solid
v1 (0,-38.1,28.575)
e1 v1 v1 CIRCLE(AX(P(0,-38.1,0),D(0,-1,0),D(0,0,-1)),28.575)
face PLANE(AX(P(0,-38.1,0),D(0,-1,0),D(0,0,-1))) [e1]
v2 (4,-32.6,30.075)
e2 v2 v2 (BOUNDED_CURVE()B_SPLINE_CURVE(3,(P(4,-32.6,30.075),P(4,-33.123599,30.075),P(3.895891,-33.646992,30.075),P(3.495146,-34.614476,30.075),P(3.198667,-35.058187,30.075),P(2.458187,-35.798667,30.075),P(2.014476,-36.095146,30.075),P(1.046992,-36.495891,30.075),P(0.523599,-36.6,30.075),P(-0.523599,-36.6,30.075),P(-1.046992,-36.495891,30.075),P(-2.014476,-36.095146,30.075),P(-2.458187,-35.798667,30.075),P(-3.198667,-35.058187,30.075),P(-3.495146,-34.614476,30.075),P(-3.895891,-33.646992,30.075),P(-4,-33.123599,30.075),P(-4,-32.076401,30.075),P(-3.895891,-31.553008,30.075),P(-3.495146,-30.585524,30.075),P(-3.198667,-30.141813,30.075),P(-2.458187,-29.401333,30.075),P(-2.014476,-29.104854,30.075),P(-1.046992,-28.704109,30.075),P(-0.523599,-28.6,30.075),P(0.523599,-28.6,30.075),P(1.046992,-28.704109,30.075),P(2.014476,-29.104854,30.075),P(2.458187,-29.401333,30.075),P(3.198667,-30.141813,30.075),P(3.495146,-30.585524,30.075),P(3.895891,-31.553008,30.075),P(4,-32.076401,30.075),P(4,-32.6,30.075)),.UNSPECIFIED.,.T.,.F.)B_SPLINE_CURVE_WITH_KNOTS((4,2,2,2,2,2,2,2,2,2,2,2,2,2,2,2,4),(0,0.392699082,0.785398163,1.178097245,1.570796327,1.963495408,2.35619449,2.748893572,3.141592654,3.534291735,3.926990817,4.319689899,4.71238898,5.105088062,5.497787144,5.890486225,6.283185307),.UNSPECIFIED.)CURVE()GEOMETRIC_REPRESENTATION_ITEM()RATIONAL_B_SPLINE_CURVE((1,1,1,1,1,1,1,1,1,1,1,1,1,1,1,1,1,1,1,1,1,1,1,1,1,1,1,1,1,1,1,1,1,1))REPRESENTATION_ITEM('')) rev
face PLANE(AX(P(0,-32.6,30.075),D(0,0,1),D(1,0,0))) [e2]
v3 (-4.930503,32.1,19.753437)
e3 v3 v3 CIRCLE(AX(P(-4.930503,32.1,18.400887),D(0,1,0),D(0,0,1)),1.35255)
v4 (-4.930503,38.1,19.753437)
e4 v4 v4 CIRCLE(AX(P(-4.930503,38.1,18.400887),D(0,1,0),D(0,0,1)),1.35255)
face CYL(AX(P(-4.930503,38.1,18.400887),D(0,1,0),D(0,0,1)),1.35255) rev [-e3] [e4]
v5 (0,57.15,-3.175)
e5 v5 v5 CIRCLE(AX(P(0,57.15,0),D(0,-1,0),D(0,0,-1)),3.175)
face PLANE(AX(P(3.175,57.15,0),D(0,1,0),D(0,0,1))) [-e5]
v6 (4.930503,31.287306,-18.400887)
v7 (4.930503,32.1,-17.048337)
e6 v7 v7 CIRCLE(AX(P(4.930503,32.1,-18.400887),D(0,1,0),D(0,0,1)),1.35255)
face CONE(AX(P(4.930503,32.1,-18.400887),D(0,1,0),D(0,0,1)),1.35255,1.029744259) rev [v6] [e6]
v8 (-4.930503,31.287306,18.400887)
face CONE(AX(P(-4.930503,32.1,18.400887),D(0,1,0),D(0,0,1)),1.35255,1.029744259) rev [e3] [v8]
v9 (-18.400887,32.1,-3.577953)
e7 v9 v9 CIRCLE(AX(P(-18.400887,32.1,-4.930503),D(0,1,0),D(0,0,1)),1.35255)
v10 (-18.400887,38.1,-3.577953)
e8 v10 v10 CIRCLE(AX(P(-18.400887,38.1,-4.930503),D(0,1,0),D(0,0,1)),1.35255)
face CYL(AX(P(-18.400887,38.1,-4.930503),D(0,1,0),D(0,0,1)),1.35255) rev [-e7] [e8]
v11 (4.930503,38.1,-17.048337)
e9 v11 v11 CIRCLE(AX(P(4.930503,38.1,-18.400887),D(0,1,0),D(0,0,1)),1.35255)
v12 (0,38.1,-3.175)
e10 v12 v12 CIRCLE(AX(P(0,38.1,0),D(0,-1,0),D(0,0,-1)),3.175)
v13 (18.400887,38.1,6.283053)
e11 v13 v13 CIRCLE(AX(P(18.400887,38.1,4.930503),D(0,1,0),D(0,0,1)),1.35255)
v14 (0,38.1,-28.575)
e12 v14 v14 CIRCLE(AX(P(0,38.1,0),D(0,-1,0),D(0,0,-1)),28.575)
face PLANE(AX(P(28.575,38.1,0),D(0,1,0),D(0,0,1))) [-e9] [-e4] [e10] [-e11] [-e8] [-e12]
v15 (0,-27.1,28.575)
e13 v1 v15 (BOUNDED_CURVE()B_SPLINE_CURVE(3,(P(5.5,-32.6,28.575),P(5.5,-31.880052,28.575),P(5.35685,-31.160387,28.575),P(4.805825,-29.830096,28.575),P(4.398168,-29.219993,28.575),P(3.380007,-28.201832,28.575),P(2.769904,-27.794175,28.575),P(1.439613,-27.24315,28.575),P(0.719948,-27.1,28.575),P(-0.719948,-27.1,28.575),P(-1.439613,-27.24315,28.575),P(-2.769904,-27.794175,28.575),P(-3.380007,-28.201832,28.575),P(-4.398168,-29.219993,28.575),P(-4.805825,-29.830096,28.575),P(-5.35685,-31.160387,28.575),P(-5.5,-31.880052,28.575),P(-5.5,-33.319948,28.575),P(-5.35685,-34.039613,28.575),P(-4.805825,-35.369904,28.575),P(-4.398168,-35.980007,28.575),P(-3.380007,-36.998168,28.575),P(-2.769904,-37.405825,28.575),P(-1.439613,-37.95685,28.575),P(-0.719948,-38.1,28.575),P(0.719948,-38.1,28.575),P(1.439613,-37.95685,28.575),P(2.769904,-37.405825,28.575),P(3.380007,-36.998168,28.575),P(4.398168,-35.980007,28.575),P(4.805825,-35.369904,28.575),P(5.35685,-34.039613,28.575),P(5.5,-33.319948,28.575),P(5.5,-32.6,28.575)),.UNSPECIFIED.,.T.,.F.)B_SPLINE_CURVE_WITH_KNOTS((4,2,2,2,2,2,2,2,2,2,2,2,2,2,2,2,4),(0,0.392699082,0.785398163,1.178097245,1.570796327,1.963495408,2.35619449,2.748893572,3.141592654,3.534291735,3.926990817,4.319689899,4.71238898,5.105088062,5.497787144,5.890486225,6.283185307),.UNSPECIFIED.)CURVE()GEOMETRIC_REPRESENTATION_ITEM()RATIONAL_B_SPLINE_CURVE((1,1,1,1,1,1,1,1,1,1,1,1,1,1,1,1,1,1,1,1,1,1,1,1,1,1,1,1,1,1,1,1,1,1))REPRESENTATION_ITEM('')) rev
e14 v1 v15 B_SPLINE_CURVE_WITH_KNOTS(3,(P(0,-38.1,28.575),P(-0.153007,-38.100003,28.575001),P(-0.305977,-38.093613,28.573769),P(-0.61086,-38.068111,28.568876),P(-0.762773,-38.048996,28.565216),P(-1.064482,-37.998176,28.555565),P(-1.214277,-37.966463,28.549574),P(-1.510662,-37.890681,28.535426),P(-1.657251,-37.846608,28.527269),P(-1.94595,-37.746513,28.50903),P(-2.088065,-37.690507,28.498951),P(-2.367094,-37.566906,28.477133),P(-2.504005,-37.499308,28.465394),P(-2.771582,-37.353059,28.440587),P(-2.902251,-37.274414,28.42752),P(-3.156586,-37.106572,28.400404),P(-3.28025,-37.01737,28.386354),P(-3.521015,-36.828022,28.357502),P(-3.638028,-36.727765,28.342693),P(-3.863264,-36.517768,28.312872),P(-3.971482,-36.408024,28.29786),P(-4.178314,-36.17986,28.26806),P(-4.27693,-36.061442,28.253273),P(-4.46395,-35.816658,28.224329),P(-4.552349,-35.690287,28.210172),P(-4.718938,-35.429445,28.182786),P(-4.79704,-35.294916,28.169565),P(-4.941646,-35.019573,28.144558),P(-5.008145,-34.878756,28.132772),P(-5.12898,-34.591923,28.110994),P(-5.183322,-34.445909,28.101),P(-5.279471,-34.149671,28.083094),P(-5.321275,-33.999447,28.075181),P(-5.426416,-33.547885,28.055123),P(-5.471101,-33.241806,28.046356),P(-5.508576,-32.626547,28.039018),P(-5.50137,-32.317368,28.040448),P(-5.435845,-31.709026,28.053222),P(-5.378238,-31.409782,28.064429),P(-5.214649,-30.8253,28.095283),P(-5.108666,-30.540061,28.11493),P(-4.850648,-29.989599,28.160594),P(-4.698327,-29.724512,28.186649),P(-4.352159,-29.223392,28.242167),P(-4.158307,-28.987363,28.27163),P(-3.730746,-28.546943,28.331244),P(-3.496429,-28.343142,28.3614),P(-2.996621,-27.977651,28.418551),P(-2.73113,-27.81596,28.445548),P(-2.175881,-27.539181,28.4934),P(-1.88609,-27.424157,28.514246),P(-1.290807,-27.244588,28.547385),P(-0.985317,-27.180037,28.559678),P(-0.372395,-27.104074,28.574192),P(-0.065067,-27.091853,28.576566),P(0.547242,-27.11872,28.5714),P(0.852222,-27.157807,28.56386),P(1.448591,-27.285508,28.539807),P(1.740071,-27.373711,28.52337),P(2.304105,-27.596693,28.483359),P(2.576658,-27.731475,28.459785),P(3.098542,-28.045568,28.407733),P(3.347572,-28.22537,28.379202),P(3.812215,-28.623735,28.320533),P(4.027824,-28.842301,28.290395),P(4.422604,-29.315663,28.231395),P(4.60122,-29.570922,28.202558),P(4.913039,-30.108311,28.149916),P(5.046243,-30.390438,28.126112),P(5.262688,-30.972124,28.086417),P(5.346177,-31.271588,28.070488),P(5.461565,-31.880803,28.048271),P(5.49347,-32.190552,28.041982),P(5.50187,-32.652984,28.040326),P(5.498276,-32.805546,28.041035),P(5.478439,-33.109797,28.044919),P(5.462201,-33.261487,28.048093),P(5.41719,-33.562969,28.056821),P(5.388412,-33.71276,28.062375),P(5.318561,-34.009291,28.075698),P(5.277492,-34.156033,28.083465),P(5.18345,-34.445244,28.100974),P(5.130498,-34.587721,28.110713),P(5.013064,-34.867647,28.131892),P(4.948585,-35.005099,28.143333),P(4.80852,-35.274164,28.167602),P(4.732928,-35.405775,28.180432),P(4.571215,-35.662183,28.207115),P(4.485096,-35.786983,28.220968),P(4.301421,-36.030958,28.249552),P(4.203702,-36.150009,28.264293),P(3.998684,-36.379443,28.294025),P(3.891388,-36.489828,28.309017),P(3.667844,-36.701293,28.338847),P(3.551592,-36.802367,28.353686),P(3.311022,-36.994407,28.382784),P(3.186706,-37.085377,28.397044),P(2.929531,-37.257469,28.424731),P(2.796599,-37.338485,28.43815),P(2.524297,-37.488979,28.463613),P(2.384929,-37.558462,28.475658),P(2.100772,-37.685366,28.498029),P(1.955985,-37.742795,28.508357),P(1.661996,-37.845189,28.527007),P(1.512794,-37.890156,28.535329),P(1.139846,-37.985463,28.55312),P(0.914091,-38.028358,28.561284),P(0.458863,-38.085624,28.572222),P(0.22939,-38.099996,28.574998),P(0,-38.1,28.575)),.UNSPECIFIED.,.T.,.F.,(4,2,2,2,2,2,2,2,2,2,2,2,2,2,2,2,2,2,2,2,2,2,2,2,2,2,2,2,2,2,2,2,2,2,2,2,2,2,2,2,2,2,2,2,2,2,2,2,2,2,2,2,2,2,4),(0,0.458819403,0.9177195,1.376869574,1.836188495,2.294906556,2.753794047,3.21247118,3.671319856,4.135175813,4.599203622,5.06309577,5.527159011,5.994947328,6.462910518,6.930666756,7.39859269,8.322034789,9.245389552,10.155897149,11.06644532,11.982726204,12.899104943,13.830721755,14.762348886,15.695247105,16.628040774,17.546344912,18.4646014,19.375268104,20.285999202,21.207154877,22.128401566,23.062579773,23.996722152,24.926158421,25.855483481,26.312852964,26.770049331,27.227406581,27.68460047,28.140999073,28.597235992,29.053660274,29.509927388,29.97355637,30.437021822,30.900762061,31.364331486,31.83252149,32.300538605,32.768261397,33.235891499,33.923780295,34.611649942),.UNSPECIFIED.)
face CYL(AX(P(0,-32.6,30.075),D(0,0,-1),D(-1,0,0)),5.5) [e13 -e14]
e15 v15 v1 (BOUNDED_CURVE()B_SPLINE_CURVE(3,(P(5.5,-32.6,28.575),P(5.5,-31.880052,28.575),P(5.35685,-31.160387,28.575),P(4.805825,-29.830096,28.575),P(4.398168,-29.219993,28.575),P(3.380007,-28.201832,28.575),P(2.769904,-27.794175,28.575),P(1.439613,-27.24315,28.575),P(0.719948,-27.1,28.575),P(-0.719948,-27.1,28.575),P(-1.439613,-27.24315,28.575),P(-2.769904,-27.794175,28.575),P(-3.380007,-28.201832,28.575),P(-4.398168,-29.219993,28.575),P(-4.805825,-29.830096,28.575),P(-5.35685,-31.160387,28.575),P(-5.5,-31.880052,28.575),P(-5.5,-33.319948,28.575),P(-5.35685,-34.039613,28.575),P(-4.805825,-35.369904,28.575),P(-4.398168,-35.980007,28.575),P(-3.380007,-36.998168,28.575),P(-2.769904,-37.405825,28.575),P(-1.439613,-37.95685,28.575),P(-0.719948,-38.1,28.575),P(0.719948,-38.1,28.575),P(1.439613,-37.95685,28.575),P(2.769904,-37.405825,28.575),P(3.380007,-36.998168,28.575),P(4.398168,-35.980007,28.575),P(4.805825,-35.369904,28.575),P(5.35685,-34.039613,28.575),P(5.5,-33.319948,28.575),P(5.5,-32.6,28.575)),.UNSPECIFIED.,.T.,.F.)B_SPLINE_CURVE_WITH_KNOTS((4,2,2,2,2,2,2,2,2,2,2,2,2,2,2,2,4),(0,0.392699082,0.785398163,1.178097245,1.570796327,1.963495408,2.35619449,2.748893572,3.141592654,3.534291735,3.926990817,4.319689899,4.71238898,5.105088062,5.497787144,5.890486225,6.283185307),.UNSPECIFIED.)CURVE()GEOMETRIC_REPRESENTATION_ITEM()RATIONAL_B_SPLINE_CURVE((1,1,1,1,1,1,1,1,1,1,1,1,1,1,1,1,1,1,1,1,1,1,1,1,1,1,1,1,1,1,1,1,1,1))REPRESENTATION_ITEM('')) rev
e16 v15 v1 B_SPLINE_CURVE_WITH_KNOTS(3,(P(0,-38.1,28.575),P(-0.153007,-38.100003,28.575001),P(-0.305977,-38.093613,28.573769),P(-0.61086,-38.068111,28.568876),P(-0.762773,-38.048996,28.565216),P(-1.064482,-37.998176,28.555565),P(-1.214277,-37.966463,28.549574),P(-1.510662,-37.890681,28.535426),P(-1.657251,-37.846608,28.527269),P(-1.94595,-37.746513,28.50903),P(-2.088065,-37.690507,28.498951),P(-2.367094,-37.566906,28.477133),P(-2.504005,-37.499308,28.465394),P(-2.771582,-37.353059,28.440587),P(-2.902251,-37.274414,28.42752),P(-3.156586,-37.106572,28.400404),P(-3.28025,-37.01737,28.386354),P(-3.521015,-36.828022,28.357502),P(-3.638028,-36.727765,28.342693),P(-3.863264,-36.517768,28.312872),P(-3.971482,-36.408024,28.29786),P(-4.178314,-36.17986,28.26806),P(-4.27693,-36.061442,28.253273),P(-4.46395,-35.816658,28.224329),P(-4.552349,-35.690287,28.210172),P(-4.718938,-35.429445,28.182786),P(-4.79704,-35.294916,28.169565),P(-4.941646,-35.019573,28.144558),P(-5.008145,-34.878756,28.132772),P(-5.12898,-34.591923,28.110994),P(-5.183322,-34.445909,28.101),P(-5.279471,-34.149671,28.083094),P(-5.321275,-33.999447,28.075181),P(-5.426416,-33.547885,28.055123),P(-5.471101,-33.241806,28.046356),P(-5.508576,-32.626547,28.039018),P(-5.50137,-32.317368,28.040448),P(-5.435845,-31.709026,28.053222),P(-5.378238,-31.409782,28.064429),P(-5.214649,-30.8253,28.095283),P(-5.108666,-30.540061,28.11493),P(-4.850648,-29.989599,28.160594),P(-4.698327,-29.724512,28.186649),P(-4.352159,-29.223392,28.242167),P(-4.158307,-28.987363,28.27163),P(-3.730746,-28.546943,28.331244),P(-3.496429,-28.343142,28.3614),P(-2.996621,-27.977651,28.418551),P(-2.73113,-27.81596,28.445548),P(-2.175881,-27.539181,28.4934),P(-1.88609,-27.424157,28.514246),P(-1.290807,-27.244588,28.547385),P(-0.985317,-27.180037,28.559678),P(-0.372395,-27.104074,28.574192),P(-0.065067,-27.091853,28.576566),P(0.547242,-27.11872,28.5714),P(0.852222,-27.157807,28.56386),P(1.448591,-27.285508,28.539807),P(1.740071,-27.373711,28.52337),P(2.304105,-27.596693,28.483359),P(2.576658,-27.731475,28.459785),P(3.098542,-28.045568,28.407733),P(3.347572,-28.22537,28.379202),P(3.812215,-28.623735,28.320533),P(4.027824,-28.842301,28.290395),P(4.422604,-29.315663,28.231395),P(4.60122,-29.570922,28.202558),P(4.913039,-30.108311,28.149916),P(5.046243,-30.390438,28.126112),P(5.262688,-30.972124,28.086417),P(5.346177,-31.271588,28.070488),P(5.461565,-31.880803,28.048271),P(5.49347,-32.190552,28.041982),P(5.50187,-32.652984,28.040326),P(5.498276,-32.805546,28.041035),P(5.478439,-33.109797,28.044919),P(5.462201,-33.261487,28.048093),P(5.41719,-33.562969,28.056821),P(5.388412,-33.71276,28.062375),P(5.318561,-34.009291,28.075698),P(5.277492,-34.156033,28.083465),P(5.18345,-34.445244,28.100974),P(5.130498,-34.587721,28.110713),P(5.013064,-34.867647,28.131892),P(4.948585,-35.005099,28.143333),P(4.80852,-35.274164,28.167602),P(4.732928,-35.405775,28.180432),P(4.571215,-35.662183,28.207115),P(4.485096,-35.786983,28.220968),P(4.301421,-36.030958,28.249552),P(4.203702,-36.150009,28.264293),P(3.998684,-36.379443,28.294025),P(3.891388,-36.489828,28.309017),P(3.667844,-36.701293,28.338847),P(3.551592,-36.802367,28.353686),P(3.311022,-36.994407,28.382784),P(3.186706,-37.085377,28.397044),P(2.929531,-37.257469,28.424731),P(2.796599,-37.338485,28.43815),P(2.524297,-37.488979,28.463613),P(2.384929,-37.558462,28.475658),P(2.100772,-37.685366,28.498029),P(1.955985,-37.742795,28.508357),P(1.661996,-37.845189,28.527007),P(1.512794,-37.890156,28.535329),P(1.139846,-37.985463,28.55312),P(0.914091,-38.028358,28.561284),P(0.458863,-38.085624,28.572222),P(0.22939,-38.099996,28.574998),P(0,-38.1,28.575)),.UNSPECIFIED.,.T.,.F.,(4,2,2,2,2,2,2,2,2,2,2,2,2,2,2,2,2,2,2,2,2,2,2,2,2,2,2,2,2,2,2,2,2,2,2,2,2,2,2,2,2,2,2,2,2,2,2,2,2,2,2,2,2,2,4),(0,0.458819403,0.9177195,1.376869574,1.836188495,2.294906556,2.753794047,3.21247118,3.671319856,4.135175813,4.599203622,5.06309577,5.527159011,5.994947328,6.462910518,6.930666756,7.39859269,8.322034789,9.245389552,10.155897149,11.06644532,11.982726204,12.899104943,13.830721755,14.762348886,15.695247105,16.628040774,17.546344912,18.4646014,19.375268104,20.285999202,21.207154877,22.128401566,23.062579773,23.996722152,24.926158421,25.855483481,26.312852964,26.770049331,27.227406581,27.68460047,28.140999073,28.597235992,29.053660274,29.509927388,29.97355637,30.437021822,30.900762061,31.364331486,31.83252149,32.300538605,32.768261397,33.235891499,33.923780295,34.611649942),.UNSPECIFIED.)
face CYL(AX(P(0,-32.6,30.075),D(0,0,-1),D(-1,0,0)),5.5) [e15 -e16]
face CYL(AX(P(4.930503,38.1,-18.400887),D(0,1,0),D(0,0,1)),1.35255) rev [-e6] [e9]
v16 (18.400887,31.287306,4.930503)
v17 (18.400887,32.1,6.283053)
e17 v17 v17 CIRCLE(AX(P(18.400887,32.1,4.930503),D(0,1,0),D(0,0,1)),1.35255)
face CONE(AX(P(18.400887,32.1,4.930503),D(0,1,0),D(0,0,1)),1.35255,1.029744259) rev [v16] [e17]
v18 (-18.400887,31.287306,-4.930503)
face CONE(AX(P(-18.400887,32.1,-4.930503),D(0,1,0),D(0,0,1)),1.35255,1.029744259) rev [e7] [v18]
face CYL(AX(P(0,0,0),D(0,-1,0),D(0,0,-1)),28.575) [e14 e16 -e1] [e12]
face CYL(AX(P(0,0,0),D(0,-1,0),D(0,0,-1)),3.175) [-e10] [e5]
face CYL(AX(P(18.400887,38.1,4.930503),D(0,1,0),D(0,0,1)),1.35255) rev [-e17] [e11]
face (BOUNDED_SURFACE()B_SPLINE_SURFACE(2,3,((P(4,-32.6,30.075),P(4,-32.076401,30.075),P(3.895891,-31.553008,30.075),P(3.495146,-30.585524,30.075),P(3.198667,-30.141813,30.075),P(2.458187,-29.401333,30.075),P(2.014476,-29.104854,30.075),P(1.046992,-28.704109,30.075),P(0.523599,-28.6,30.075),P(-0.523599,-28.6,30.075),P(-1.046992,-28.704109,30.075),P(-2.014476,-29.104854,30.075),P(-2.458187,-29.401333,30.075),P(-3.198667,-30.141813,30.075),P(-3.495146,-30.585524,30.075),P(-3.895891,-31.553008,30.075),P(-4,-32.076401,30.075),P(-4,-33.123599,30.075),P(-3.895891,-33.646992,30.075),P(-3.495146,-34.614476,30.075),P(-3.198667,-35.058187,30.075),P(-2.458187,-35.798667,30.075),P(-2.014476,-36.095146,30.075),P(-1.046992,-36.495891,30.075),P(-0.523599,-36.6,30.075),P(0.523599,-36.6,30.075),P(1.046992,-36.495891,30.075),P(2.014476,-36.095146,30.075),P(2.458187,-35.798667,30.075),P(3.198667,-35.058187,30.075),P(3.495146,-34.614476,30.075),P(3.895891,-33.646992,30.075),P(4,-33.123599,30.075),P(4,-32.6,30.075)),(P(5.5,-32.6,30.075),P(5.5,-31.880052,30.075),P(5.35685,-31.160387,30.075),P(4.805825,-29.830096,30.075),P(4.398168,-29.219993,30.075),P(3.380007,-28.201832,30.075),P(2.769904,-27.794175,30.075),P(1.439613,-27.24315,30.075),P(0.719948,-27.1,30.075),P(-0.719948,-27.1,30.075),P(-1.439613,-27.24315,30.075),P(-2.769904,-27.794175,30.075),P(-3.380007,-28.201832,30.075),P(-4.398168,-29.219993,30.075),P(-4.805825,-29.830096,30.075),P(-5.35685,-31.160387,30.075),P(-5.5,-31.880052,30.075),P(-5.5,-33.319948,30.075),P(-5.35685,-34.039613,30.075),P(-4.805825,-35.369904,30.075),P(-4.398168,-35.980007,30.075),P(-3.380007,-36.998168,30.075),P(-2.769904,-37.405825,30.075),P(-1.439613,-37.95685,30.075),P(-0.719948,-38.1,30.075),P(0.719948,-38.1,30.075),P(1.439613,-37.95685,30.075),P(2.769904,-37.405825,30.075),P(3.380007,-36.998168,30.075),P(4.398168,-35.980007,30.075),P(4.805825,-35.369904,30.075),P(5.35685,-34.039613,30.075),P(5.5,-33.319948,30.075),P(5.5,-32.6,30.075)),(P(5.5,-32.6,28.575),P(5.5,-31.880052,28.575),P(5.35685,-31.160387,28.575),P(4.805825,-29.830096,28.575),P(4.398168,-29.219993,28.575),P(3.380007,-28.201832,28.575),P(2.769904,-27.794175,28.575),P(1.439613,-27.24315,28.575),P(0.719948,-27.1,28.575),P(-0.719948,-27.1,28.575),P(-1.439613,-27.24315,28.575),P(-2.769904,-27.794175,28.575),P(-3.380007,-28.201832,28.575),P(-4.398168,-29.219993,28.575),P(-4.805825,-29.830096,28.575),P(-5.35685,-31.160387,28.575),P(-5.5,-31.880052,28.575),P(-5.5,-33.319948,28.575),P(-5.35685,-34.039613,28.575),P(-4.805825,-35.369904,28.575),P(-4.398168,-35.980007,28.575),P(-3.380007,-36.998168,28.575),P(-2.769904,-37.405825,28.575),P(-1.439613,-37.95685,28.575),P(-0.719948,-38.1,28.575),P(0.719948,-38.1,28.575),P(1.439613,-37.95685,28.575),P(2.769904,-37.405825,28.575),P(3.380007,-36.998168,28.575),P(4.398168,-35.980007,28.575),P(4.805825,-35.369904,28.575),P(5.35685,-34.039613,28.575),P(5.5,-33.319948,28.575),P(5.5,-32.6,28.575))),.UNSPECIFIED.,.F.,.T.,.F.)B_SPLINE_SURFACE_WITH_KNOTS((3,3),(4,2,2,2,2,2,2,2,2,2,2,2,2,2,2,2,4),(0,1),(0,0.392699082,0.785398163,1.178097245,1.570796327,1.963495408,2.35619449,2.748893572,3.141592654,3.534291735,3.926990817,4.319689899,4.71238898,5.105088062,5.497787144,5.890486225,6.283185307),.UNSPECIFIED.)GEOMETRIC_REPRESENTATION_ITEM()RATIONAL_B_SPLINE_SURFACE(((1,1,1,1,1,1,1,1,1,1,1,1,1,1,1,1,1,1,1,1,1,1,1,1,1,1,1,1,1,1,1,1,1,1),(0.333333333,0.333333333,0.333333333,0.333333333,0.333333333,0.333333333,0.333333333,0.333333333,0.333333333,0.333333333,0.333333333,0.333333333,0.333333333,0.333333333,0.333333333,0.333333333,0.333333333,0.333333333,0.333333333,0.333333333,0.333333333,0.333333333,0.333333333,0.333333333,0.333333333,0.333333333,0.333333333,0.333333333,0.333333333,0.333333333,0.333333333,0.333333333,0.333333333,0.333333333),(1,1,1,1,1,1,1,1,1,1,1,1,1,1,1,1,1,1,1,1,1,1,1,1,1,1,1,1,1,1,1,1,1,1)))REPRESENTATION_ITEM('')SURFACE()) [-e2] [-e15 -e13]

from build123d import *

# Parameters (mm, degrees)
SKETCH2_R           = 5.5
BOSS_EXTRUDE1_DEPTH = 1.5
CIRPATTERN1_COUNT   = 4
FILLET2_SIZE        = 1.5


with BuildPart() as part:
    # Sketch1 → Revolve1 (revolve)
    with BuildSketch(Plane.XY, mode=Mode.PRIVATE) as revolve1_sk:
        Polygon((0, 38.1), (0, -38.1), (28.575, -38.1), (28.575, 38.1), (3.175, 38.1), (3.175, 57.15), (0, 57.15), align=None)
    revolve(revolve1_sk.sketch.rotate(Axis((0, 0, 0), (0, 1, 0)), 90), axis=Axis((0, 0, 0), (0, 1, 0)))

    # Sketch2 → Boss-Extrude1 (add, symmetric)
    with BuildSketch(Plane.XY.offset(28.575)):
        with Locations(Location((0, -32.6, 0), (0, 0, 270))):
            Circle(SKETCH2_R)
    extrude(amount=BOSS_EXTRUDE1_DEPTH, both=True)

    # Sketch5 → #6-32 Tapped Hole1 (revolve, cut)
    with BuildSketch(Plane(origin=(4.930502809, 38.1, -18.400886991), x_dir=(0, 0, 1), z_dir=(1, 0, 0))):
        Polygon((0, 0), (0, 6.81269403), (1.35255, 6), (1.35255, 0), align=None)
    f_6_32_tapped_hole1 = revolve(axis=Axis((4.930502809, 44.45, -18.400886991), (0, -1, 0)), mode=Mode.SUBTRACT)

    # CirPattern1: #6-32 Tapped Hole1 ×4 about axis
    cirpattern1_axis = Axis((0, 0, 0), (0, 1, 0))
    for i in range(1, CIRPATTERN1_COUNT):
        add(f_6_32_tapped_hole1.rotate(cirpattern1_axis, i * 360 / CIRPATTERN1_COUNT), mode=Mode.SUBTRACT)

    # Fillet2
    # a fillet whose section is not a circle: 1.5 mm, written as the material it takes off along each edge
    with BuildSketch(Plane(origin=(0, -32.6, 30.075), x_dir=(0, -1, 0), z_dir=(-1, 0, 0))) as fillet2_piece_1_section:
        with BuildLine():
            Bezier((5.5, -FILLET2_SIZE), (5.5, 0), (5.5 - FILLET2_SIZE, 0), weights=[1, 0.333333333, 1])
            Line((5.5 - FILLET2_SIZE, 0), (5.5, 0))
            Line((5.5, 0), (5.5, -FILLET2_SIZE))
        make_face()
    fillet2_piece_1 = revolve(axis=Axis((0, -32.6, 30.075), (0, 0, 1)), mode=Mode.PRIVATE)
    fillet2_piece_1 = fillet2_piece_1 - Plane(origin=(0, -32.6, 0), x_dir=(0, 0, -1), z_dir=(0, 1, 0)) * Cylinder(28.575, 22, mode=Mode.PRIVATE)
    add(fillet2_piece_1, mode=Mode.SUBTRACT)


solid = part.part
